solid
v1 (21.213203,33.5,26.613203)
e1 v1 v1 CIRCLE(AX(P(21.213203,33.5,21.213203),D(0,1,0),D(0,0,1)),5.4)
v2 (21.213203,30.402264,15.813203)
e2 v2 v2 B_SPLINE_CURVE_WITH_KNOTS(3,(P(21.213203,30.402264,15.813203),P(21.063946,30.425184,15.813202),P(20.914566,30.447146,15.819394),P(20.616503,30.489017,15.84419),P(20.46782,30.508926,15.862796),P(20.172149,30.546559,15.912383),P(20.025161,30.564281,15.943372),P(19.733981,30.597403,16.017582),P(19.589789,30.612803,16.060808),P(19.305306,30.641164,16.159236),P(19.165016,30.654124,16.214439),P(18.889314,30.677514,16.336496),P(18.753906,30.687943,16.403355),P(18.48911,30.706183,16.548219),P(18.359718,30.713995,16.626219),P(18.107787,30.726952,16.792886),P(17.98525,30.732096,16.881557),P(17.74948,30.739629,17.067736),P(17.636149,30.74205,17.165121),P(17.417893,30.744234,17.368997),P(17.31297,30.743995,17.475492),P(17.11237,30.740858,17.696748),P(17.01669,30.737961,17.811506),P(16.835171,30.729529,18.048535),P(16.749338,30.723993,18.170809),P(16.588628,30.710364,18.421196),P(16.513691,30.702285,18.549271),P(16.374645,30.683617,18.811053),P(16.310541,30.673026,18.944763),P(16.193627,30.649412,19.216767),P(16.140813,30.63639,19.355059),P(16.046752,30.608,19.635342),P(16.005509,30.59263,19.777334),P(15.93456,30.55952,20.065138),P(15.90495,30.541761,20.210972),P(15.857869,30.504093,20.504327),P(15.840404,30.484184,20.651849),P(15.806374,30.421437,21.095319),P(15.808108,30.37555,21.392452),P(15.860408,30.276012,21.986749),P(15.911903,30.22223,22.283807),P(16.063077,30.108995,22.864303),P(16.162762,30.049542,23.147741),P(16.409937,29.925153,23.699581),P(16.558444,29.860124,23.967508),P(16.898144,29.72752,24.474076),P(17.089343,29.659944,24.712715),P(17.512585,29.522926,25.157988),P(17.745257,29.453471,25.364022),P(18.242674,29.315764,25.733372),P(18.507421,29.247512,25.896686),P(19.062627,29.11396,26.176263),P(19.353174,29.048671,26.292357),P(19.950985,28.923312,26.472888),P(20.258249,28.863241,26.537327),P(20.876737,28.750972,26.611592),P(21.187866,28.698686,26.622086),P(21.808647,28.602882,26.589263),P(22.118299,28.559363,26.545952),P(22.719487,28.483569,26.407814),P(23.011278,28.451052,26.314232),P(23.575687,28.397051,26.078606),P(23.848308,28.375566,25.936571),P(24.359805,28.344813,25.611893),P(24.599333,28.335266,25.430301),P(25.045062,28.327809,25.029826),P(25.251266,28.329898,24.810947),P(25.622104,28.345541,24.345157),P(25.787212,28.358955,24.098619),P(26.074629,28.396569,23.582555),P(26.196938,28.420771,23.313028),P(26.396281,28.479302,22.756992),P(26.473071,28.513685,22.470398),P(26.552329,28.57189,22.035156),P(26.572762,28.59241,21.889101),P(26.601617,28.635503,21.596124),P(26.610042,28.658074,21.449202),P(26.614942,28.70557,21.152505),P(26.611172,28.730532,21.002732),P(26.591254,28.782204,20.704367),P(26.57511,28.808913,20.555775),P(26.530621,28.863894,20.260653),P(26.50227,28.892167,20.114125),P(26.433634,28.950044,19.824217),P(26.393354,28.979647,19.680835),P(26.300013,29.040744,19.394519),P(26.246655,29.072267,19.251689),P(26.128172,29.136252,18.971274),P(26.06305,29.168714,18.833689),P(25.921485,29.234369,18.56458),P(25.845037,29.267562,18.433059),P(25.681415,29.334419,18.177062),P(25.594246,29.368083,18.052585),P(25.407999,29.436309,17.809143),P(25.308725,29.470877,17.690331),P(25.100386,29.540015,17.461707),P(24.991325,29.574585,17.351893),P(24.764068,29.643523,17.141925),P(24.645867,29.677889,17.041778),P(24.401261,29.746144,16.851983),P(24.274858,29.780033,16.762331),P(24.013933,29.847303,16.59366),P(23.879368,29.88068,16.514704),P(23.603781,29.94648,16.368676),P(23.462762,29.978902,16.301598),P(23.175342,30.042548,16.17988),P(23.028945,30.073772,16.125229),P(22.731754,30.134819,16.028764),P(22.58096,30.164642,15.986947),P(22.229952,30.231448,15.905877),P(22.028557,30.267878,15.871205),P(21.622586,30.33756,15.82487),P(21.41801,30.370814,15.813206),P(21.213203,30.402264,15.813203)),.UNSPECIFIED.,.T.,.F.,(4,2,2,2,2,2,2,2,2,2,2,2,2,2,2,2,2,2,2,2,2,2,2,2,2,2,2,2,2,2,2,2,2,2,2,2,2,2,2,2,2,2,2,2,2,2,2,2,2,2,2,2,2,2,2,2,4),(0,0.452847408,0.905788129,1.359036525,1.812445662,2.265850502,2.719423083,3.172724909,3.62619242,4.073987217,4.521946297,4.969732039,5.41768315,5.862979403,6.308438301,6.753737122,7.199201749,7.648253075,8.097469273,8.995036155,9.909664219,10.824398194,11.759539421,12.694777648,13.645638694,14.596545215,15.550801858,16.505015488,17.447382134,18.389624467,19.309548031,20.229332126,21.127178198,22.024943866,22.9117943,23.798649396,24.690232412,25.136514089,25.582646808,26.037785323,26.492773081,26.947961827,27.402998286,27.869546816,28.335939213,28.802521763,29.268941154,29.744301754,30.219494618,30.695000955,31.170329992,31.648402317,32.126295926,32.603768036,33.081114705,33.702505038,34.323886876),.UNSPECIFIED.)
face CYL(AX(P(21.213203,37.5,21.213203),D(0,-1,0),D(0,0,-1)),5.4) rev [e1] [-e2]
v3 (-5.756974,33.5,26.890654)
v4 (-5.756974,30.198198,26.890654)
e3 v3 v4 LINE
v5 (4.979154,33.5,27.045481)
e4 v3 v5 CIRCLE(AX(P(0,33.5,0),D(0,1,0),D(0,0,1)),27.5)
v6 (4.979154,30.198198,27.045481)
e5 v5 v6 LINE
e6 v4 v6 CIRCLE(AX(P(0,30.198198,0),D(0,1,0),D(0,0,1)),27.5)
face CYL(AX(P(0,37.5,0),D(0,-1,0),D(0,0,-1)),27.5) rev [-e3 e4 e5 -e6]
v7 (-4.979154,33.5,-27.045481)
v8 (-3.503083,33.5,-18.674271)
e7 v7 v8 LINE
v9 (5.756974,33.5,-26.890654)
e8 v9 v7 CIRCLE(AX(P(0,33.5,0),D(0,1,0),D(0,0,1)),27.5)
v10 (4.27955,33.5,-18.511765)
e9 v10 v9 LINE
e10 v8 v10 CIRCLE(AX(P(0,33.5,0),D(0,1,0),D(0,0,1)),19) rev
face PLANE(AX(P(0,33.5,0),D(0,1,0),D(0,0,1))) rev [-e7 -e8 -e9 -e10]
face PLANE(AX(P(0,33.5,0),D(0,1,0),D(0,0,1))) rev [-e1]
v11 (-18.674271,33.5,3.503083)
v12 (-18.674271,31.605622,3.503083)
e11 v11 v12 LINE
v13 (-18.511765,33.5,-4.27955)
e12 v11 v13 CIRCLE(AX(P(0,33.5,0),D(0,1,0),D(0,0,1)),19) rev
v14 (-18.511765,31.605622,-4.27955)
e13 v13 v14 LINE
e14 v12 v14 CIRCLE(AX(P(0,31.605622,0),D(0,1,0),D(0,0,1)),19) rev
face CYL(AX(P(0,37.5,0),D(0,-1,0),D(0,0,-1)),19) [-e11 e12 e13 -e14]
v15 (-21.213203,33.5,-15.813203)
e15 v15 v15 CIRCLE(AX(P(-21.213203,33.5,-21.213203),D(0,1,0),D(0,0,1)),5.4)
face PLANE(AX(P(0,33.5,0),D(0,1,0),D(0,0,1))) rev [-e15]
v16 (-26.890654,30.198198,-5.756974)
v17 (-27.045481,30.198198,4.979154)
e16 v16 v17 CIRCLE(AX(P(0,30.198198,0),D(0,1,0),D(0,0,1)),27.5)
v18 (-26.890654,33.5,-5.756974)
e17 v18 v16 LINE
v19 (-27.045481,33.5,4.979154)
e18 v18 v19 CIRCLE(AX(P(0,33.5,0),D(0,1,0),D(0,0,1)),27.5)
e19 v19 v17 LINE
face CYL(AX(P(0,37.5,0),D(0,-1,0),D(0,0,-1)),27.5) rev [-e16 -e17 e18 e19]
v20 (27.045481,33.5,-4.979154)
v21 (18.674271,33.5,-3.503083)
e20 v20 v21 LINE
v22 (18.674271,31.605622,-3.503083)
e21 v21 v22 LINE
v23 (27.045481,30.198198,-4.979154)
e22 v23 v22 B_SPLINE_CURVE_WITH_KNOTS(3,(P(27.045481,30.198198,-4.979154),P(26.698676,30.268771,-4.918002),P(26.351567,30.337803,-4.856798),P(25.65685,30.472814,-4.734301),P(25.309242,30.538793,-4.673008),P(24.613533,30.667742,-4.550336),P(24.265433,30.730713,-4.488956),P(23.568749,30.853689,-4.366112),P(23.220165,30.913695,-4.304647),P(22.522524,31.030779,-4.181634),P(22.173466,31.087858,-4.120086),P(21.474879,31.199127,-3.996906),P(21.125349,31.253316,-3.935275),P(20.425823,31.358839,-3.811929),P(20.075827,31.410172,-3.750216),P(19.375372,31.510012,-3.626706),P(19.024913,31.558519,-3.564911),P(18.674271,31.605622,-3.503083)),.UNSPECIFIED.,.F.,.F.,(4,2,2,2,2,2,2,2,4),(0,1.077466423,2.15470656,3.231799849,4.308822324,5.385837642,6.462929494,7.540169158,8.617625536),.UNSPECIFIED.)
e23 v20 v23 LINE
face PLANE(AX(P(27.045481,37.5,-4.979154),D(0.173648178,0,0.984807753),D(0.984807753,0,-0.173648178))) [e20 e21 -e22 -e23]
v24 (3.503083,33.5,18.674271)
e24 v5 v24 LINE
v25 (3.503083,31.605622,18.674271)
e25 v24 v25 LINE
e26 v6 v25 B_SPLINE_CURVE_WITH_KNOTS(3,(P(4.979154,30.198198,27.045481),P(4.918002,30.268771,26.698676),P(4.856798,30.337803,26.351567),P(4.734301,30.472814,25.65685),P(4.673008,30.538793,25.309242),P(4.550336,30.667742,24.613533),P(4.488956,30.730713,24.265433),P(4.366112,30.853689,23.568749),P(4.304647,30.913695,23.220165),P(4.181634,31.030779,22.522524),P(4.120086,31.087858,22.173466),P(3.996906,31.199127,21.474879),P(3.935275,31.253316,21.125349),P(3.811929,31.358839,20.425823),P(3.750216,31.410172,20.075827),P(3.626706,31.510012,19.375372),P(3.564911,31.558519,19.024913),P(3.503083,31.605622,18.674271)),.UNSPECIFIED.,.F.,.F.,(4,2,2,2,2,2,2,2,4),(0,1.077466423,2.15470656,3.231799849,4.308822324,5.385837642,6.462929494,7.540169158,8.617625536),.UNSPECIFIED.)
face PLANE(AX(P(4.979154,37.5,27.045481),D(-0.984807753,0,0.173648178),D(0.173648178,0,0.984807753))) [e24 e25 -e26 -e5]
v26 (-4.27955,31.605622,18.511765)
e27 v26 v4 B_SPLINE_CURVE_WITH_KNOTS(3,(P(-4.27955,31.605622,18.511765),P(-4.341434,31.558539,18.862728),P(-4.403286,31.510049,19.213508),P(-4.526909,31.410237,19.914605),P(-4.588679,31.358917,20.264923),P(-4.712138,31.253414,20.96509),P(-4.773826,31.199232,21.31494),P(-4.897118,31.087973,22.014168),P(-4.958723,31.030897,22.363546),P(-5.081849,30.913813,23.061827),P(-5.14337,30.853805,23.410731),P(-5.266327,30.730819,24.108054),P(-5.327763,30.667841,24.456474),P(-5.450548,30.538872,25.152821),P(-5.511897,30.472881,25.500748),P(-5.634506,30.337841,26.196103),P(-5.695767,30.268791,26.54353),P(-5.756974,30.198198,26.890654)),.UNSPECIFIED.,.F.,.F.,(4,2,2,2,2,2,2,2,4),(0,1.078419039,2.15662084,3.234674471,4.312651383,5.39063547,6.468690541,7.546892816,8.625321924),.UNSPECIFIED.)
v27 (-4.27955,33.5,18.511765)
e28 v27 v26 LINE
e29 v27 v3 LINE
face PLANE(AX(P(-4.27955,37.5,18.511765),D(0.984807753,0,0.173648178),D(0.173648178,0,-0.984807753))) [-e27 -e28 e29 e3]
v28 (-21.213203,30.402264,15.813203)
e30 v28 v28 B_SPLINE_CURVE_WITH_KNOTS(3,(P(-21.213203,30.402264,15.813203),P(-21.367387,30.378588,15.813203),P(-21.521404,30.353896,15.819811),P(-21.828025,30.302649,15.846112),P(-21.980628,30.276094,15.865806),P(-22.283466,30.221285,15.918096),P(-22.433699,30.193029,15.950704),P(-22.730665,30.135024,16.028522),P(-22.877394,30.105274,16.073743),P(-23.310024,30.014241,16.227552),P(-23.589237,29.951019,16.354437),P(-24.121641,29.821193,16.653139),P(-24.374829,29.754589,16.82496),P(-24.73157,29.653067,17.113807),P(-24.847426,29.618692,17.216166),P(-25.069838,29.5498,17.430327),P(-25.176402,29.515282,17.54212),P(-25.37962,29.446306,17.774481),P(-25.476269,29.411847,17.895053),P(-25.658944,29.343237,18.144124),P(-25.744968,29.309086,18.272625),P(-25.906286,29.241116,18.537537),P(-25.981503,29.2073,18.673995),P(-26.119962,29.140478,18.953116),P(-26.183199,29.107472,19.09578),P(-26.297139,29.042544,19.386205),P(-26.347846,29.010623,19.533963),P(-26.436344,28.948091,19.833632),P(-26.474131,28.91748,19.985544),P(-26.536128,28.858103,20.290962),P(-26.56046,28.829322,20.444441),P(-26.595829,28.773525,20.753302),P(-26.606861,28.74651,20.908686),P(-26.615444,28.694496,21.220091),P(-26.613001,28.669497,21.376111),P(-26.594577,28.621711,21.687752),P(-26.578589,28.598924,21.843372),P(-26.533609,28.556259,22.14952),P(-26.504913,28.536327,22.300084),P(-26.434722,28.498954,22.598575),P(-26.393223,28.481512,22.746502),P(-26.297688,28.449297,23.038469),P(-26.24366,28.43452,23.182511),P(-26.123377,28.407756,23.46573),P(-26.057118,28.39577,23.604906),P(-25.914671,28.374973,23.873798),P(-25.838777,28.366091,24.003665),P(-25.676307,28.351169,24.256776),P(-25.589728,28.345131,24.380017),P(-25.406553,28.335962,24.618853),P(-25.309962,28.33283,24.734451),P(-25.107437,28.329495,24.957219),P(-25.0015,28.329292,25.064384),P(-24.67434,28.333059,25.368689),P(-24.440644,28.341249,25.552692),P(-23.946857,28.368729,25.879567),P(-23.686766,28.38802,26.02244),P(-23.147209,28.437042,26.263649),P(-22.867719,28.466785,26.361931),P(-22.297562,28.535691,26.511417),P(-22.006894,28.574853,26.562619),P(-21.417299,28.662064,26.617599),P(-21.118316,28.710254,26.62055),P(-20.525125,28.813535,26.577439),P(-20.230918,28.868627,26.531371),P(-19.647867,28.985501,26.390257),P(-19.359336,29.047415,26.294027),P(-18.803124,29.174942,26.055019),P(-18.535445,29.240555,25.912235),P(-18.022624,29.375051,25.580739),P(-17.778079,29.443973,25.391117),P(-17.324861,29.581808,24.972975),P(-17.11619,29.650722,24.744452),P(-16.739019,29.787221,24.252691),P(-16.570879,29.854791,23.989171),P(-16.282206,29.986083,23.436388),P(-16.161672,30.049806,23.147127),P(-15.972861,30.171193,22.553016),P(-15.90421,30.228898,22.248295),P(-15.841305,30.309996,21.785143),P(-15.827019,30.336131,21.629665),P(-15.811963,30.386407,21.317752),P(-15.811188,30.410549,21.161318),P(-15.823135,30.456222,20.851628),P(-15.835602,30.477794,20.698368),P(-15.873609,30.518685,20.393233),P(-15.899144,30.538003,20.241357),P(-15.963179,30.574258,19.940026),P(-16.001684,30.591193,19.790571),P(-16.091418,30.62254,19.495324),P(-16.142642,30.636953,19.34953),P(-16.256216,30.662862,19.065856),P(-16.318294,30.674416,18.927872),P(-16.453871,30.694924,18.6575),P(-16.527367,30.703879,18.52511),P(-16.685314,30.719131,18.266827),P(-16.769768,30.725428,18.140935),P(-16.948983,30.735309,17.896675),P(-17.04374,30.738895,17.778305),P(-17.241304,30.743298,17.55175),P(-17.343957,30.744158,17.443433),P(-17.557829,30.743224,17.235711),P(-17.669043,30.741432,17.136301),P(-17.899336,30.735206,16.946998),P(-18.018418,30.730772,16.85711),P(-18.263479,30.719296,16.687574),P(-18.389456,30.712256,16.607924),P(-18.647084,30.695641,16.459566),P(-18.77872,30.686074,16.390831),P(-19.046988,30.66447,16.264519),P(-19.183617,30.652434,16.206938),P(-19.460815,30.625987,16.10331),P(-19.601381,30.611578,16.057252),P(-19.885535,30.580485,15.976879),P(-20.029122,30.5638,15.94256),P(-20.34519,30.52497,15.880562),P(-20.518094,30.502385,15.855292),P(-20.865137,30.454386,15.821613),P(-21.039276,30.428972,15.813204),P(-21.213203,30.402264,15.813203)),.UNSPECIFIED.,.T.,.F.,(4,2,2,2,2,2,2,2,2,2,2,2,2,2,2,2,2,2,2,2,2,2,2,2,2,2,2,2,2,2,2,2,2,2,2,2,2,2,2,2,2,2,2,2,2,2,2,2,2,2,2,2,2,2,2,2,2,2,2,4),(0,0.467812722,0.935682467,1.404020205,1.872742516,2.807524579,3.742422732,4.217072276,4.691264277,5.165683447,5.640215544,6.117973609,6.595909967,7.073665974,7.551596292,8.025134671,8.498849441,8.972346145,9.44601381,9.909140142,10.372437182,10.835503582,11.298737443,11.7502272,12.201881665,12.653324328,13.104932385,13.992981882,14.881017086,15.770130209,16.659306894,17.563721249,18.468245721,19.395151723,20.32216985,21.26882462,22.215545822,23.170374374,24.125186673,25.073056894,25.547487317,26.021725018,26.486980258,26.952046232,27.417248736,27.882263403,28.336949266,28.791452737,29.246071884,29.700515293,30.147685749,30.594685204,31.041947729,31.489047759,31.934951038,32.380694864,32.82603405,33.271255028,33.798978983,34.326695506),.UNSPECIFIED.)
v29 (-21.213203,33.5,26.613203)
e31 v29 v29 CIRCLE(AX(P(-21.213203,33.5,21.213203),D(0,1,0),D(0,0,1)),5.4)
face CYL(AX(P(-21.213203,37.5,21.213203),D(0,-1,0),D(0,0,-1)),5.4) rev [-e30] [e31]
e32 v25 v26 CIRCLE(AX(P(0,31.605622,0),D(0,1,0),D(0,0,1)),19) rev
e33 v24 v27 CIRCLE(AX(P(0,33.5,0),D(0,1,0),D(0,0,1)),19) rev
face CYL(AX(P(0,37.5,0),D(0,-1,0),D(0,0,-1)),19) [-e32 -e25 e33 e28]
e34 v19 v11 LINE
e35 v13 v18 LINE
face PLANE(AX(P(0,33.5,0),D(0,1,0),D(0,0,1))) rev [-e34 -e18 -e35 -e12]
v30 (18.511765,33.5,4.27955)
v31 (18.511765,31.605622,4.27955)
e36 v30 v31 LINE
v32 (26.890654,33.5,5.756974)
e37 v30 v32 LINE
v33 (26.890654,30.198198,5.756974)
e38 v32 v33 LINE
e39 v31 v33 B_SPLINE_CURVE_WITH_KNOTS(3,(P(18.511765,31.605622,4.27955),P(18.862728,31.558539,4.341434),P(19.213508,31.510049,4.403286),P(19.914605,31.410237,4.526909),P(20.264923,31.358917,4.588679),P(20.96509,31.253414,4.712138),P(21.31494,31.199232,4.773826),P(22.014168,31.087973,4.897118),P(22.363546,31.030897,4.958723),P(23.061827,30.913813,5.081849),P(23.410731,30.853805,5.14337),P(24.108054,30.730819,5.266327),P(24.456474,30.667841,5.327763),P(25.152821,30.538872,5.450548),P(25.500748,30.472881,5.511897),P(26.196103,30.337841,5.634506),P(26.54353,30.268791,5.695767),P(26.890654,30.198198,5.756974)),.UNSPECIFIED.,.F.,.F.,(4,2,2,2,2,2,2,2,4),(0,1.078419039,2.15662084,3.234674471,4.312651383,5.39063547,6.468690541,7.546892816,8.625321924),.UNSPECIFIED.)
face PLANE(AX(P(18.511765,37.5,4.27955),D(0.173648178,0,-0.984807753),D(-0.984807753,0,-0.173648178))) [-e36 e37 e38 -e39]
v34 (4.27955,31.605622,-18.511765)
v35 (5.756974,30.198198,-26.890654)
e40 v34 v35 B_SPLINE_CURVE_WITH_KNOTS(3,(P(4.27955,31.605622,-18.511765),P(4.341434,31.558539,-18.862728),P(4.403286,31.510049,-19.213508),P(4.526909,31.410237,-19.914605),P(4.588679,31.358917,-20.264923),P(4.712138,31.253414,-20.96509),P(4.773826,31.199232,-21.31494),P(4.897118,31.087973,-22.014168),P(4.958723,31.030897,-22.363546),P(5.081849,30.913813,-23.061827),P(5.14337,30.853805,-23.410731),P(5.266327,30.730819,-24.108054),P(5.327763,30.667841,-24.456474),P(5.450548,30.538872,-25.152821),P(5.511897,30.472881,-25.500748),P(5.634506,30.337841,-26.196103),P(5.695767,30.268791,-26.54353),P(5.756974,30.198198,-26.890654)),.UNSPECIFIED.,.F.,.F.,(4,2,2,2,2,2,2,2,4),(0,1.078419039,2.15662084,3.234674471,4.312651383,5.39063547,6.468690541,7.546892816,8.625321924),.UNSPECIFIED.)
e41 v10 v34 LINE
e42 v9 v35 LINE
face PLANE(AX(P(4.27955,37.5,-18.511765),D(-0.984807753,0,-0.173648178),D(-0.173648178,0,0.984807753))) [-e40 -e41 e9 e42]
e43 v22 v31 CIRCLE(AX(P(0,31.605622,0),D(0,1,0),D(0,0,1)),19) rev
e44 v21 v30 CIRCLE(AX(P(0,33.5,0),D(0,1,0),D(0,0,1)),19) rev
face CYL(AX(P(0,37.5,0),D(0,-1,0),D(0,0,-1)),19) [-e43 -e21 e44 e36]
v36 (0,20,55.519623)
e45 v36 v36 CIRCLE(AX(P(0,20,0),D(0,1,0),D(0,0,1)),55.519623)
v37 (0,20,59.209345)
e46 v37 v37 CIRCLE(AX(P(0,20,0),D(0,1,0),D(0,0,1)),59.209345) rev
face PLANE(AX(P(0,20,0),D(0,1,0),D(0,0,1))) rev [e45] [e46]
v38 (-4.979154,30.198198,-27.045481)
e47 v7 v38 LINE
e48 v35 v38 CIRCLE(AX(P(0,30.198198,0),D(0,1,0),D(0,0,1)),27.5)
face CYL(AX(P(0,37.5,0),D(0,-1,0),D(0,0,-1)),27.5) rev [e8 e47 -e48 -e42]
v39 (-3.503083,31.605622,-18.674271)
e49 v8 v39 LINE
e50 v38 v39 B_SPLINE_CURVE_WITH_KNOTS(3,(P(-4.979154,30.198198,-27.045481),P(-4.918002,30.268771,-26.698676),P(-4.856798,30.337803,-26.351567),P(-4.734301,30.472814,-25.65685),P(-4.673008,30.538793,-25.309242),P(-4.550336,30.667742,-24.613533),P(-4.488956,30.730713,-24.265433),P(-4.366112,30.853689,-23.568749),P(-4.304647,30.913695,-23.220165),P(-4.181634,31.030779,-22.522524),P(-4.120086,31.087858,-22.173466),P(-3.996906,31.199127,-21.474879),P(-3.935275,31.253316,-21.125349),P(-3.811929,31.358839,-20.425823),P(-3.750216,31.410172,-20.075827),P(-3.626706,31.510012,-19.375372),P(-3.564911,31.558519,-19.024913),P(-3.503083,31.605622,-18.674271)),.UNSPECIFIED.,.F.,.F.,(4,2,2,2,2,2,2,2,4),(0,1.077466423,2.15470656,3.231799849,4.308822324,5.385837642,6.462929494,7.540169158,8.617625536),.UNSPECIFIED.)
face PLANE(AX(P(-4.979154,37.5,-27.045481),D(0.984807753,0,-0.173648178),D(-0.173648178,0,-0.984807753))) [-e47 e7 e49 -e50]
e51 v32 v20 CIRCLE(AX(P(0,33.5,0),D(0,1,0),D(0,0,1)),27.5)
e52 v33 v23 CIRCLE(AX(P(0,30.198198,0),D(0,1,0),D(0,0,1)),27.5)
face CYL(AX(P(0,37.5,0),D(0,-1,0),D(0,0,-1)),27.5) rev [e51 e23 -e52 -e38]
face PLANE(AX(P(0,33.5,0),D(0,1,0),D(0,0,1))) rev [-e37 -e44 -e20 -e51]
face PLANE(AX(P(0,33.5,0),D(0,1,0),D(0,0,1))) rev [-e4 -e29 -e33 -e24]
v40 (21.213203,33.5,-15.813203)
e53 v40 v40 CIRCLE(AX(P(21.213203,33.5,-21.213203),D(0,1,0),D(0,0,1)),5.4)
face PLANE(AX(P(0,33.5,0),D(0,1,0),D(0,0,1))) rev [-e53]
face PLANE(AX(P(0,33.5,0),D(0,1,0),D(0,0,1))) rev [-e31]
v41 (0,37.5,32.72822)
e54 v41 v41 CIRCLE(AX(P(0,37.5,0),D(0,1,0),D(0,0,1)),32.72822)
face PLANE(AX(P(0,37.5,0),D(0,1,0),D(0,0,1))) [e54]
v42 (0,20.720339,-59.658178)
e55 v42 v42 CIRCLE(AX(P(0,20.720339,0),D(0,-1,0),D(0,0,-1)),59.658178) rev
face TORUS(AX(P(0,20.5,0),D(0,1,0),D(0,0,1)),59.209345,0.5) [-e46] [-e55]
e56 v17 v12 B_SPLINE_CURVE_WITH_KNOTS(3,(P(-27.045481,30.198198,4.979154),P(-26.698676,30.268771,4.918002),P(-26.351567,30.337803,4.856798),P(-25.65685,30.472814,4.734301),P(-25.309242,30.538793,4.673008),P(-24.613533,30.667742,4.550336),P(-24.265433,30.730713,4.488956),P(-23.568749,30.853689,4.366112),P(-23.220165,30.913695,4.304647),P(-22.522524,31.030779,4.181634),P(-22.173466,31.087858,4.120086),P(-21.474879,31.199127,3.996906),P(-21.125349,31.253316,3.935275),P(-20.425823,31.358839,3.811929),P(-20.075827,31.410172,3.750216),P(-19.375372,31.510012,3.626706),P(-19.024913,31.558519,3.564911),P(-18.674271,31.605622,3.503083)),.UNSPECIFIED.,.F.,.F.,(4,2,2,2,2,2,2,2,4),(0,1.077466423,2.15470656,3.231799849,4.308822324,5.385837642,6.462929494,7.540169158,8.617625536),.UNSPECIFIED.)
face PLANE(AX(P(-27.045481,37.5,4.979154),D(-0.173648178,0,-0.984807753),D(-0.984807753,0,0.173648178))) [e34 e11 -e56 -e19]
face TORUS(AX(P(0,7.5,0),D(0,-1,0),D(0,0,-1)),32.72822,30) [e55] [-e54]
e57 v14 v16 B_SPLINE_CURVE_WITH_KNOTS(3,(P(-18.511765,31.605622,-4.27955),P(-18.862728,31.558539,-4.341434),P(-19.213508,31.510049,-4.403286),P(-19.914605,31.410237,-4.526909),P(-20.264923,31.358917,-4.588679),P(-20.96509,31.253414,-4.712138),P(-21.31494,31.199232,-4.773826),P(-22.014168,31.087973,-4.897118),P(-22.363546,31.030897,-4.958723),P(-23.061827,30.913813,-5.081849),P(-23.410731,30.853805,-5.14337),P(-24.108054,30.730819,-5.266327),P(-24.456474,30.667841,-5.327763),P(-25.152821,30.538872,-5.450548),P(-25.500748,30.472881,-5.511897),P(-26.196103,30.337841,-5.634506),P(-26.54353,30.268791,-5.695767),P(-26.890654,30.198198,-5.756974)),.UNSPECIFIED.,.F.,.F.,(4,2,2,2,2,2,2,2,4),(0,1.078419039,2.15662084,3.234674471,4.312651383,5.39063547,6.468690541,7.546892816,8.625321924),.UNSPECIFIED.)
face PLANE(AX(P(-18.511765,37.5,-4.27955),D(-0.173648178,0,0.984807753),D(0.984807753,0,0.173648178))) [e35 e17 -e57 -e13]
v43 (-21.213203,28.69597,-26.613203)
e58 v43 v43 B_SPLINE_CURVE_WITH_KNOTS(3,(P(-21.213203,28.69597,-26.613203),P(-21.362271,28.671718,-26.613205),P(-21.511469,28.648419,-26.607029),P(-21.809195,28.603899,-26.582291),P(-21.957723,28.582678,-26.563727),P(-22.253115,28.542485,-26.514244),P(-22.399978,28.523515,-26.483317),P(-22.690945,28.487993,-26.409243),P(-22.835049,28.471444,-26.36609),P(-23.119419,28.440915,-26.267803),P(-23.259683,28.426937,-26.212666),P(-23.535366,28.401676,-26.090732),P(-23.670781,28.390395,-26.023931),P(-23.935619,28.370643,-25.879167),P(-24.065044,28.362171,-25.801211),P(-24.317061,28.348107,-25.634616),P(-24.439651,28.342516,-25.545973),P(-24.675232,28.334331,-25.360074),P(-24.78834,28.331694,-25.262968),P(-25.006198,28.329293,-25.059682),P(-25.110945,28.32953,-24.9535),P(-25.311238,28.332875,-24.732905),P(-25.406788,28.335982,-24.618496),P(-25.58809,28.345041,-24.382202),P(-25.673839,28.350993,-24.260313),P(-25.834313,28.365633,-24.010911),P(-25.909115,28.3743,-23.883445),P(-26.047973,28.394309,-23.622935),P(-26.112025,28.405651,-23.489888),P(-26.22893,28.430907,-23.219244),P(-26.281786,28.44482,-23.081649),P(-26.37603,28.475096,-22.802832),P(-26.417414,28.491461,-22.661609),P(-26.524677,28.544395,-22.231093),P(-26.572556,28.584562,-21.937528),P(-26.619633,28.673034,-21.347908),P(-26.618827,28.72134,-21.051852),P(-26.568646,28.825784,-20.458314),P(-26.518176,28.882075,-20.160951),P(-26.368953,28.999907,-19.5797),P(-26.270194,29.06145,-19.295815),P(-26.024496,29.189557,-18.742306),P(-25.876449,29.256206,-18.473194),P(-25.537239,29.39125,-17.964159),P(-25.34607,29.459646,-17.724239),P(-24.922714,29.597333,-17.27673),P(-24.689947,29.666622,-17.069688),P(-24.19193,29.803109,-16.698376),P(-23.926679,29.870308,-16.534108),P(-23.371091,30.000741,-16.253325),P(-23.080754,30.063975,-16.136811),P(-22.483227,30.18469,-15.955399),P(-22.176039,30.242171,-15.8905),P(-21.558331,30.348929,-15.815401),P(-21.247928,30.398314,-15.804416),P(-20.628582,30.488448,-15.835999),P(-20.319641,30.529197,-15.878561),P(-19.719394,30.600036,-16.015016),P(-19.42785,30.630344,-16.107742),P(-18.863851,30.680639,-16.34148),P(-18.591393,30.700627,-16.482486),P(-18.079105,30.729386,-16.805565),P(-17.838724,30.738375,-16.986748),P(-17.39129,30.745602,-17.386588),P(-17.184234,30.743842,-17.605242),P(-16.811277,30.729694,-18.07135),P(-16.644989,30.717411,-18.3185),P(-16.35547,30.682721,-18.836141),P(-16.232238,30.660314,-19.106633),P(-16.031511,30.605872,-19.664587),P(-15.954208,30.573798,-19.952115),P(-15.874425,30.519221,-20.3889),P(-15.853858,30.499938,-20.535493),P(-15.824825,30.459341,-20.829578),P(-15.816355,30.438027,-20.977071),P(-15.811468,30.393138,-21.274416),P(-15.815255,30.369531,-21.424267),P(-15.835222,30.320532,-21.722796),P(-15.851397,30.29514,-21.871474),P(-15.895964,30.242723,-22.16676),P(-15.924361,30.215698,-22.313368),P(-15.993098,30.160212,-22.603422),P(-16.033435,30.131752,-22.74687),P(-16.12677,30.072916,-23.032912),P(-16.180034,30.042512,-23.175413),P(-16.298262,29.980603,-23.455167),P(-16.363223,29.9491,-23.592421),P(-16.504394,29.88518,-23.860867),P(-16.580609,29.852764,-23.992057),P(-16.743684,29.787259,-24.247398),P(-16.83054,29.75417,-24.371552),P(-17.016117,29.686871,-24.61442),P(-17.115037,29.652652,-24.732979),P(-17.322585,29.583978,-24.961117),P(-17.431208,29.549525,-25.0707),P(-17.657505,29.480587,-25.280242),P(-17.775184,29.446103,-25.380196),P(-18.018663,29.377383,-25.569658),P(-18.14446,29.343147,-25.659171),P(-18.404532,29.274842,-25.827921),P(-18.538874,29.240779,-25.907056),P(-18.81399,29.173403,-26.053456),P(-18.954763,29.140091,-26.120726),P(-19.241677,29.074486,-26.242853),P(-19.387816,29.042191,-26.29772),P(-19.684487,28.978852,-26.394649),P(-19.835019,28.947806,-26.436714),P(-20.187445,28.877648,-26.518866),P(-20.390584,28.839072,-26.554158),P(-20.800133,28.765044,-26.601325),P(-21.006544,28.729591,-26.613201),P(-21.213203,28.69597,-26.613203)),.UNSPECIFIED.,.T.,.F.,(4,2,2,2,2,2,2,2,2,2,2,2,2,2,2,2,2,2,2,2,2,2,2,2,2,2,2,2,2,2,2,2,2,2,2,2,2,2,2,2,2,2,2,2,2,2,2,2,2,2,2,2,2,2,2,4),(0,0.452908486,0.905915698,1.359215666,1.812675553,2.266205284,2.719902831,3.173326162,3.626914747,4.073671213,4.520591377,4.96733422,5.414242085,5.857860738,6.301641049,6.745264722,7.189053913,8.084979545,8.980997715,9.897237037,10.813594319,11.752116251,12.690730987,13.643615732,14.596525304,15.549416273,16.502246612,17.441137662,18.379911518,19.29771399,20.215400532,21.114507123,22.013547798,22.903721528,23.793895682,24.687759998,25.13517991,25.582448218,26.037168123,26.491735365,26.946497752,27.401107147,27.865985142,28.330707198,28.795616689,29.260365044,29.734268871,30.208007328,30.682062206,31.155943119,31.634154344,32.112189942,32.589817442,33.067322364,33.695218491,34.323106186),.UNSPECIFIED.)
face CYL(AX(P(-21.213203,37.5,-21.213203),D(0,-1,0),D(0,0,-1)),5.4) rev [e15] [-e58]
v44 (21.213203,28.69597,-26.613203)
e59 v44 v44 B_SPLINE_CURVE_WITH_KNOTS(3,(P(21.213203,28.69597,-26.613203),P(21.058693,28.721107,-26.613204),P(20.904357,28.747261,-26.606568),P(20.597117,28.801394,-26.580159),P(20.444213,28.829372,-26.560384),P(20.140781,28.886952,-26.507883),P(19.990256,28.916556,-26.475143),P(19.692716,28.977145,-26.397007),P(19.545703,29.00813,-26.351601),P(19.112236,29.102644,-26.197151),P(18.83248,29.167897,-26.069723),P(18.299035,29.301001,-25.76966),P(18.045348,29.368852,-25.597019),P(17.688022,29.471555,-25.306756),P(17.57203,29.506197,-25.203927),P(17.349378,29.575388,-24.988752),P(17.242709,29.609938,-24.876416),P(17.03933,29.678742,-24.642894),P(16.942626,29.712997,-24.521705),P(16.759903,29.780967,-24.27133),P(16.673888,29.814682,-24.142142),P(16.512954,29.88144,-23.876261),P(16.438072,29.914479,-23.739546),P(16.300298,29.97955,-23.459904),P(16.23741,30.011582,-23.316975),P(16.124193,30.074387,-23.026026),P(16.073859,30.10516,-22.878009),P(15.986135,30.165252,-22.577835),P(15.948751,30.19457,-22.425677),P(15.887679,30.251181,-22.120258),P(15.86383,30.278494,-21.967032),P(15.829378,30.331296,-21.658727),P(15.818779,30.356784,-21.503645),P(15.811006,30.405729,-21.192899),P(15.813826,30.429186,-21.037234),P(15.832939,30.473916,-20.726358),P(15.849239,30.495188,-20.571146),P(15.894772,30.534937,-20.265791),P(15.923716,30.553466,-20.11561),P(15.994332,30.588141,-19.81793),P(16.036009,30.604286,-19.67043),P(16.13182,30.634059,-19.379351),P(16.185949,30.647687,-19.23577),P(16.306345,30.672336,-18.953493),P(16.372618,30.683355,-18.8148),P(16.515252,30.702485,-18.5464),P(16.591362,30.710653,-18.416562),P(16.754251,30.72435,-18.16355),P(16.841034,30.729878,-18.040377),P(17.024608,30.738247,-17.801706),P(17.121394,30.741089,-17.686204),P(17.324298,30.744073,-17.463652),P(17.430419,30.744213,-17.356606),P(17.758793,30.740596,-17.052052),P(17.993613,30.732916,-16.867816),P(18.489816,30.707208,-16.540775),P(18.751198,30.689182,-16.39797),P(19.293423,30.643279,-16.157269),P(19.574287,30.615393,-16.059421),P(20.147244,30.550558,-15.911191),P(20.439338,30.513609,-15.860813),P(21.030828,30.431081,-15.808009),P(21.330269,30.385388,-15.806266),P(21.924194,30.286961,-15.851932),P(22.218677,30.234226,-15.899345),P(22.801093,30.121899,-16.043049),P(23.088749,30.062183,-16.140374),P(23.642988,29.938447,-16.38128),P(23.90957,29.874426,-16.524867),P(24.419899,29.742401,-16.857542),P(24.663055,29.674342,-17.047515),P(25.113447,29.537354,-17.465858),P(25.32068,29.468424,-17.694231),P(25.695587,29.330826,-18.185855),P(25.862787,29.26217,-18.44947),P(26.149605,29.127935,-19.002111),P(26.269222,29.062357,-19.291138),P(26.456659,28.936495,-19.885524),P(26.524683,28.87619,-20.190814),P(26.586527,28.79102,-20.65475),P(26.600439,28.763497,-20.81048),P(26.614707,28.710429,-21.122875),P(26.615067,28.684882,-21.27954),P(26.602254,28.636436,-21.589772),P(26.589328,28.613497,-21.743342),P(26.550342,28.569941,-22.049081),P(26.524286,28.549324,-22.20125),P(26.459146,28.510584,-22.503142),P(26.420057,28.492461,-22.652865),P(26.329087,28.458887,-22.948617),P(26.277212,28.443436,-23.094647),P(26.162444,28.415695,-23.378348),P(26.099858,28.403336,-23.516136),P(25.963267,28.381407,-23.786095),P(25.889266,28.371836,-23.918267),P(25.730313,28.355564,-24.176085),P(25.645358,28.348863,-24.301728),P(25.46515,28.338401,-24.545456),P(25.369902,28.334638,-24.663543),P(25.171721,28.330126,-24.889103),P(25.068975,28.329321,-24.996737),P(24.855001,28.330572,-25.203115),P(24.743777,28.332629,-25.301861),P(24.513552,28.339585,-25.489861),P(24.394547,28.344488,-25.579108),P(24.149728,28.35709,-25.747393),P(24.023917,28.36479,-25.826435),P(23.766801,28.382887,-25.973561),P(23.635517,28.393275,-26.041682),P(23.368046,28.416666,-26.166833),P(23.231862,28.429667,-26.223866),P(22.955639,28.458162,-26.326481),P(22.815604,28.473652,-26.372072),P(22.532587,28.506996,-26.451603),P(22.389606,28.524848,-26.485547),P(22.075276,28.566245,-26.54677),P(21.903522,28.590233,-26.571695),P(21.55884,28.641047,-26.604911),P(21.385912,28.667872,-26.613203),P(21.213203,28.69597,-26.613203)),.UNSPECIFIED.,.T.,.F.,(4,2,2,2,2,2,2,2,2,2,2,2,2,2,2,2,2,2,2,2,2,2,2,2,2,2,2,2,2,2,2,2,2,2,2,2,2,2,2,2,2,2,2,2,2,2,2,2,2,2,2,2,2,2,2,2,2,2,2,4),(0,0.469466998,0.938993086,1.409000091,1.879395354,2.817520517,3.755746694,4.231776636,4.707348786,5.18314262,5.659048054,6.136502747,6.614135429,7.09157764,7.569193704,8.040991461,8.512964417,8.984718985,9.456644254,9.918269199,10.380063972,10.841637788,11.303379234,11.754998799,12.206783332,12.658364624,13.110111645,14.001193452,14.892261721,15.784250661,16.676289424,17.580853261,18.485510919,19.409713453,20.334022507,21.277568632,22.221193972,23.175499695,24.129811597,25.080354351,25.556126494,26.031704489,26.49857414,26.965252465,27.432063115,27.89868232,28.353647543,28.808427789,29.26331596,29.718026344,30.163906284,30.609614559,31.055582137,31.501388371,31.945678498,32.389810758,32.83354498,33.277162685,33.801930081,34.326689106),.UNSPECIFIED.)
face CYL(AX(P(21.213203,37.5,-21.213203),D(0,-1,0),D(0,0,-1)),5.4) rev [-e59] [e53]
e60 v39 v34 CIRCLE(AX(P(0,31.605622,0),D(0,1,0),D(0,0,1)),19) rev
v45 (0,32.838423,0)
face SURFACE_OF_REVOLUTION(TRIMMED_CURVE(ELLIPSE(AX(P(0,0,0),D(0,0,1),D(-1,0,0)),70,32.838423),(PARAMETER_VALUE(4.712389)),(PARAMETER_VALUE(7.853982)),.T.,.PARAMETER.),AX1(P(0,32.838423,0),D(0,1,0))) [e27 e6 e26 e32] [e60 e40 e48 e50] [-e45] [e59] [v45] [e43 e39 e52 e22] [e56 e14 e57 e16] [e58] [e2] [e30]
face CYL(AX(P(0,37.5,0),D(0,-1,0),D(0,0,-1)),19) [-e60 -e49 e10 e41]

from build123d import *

# Parameters (mm, degrees)
STOCK_DISK_1_START       = 20
STOCK_DISK_1_OUTLINE_R   = 40
STOCK_DISK_1_OUTLINE_R_2 = 5.4
STOCK_DISK_1_DEPTH       = 17.5
STOCK_DISK_1_START_2     = 33.5
STOCK_DISK_1_2_OUTLINE_R = 5.4
STOCK_DISK_1_2_DEPTH     = 4
SKETCH3_R                = 60
SKETCH3_R_2              = 40
BOSS_EXTRUDE2_DEPTH      = 17.5
FILLET4_R                = 30
FILLET5_R                = 0.5


# Read off the part's stored shape, not the designer's step: Stock-disk-1
with BuildPart() as part:
    # Stock-disk-1 outline → Stock-disk-1 (new body)
    with BuildSketch(Plane(origin=(0, 0, 0), x_dir=(1, 0, 0), z_dir=(0, 1, 0)).offset(STOCK_DISK_1_START)):
        Circle(STOCK_DISK_1_OUTLINE_R)
        with Locations((-21.213203436, -21.213203436)):
            Circle(STOCK_DISK_1_OUTLINE_R_2, mode=Mode.SUBTRACT)
        with BuildLine():
            ThreePointArc((-4.279550271, -18.511765164), (-0.396644977, -18.995859358), (3.503083449, -18.67427124))
            Line((3.503083449, -18.67427124), (4.97915355, -27.045480767))
            ThreePointArc((4.97915355, -27.045480767), (-0.396540251, -27.497140866), (-5.756974355, -26.890653512))
            Line((-5.756974355, -26.890653512), (-4.279550271, -18.511765164))
        make_face(mode=Mode.SUBTRACT)
        with Locations((21.213203436, -21.213203436)):
            Circle(STOCK_DISK_1_OUTLINE_R_2, mode=Mode.SUBTRACT)
        with BuildLine():
            Line((18.67427124, 3.503083449), (27.045480767, 4.97915355))
            ThreePointArc((27.045480767, 4.97915355), (27.497140866, -0.396540251), (26.890653512, -5.756974355))
            Line((26.890653512, -5.756974355), (18.511765164, -4.279550271))
            ThreePointArc((18.511765164, -4.279550271), (18.995859358, -0.396644977), (18.67427124, 3.503083449))
        make_face(mode=Mode.SUBTRACT)
        with BuildLine():
            ThreePointArc((-18.511765164, 4.279550271), (-18.995859358, 0.396644977), (-18.67427124, -3.503083449))
            Line((-18.67427124, -3.503083449), (-27.045480767, -4.97915355))
            ThreePointArc((-27.045480767, -4.97915355), (-27.497140866, 0.396540251), (-26.890653512, 5.756974355))
            Line((-26.890653512, 5.756974355), (-18.511765164, 4.279550271))
        make_face(mode=Mode.SUBTRACT)
        with Locations((-21.213203436, 21.213203436)):
            Circle(STOCK_DISK_1_OUTLINE_R_2, mode=Mode.SUBTRACT)
        with BuildLine():
            Line((-3.503083449, 18.67427124), (-4.97915355, 27.045480767))
            ThreePointArc((-4.97915355, 27.045480767), (0.396540251, 27.497140866), (5.756974355, 26.890653512))
            Line((5.756974355, 26.890653512), (4.279550271, 18.511765164))
            ThreePointArc((4.279550271, 18.511765164), (0.396644977, 18.995859358), (-3.503083449, 18.67427124))
        make_face(mode=Mode.SUBTRACT)
        with Locations((21.213203436, 21.213203436)):
            Circle(STOCK_DISK_1_OUTLINE_R_2, mode=Mode.SUBTRACT)
    extrude(amount=STOCK_DISK_1_DEPTH)

    # Stock-disk-1 2 outline → Stock-disk-1 2 (add)
    with BuildSketch(Plane(origin=(0, 0, 0), x_dir=(1, 0, 0), z_dir=(0, 1, 0)).offset(STOCK_DISK_1_START_2)):
        with Locations((-21.213203436, -21.213203436)):
            Circle(STOCK_DISK_1_2_OUTLINE_R)
        with BuildLine():
            Line((-27.045480767, -4.97915355), (-18.67427124, -3.503083449))
            ThreePointArc((-18.67427124, -3.503083449), (-18.995859358, 0.396644977), (-18.511765164, 4.279550271))
            Line((-18.511765164, 4.279550271), (-26.890653512, 5.756974355))
            ThreePointArc((-26.890653512, 5.756974355), (-27.497140866, 0.396540251), (-27.045480767, -4.97915355))
        make_face()
        with Locations((-21.213203436, 21.213203436)):
            Circle(STOCK_DISK_1_2_OUTLINE_R)
        with Locations((21.213203436, 21.213203436)):
            Circle(STOCK_DISK_1_2_OUTLINE_R)
        with Locations((21.213203436, -21.213203436)):
            Circle(STOCK_DISK_1_2_OUTLINE_R)
        with BuildLine():
            ThreePointArc((5.756974355, 26.890653512), (0.396540251, 27.497140866), (-4.97915355, 27.045480767))
            Line((-4.97915355, 27.045480767), (-3.503083449, 18.67427124))
            ThreePointArc((-3.503083449, 18.67427124), (0.396644977, 18.995859358), (4.279550271, 18.511765164))
            Line((4.279550271, 18.511765164), (5.756974355, 26.890653512))
        make_face()
        with BuildLine():
            ThreePointArc((26.890653512, -5.756974355), (27.497140866, -0.396540251), (27.045480767, 4.97915355))
            Line((27.045480767, 4.97915355), (18.67427124, 3.503083449))
            ThreePointArc((18.67427124, 3.503083449), (18.995859358, -0.396644977), (18.511765164, -4.279550271))
            Line((18.511765164, -4.279550271), (26.890653512, -5.756974355))
        make_face()
        with BuildLine():
            Line((4.97915355, -27.045480767), (3.503083449, -18.67427124))
            ThreePointArc((3.503083449, -18.67427124), (-0.396644977, -18.995859358), (-4.279550271, -18.511765164))
            Line((-4.279550271, -18.511765164), (-5.756974355, -26.890653512))
            ThreePointArc((-5.756974355, -26.890653512), (-0.396540251, -27.497140866), (4.97915355, -27.045480767))
        make_face()
    extrude(amount=STOCK_DISK_1_2_DEPTH)

    # Sketch3 → Boss-Extrude2 (add)
    with BuildSketch(Plane.XZ.offset(-20)):
        with Locations(Location((0, 0, 0), (0, 0, 270))):
            Circle(SKETCH3_R)
        Circle(SKETCH3_R_2, mode=Mode.SUBTRACT)
    extrude(amount=-BOSS_EXTRUDE2_DEPTH)

    # Fillet4
    # the kernel refuses this fillet: 30 mm, written as the material it takes off along each edge
    with BuildSketch(Plane(origin=(0, 37.5, 0), x_dir=(0, 0, -1), z_dir=(-1, 0, 0))) as fillet4_piece_1:
        with BuildLine():
            CenterArc((32.728219713, 30), FILLET4_R, 270, 65.375681648)
            Line((32.728219713, 0), (32.728219713, -0.6))
            Line((32.728219713, -0.6), (60, -0.6))
            Line((60, -0.6), (60.6, 0))
            ThreePointArc((60.6, 0), (60.6, 8.75), (60.545435606, 17.25))
            Line((60.545435606, 17.25), (60, 17.5))
        make_face()
    revolve(axis=Axis((0, 37.5, 0), (0, -1, 0)), mode=Mode.SUBTRACT)

    # Fillet5
    fillet5_edges = [part.edges().sort_by_distance(p)[0] for p in [
        (0, 20, 60),
    ]]
    fillet(fillet5_edges, radius=FILLET5_R)

    # Sketch4 → Cut-Revolve7 (revolve, cut)
    with BuildSketch(Plane.XY):
        with BuildLine():
            Line((0, 32.838422871), (0, -32.838422871))
            add(Edge.make_bspline(
                [(0, 32.838422871), (-70, 32.838422871), (-70, 0), (-70, -32.838422871), (0, -32.838422871)],
                knots=[4.71238898, 4.71238898, 4.71238898, 6.283185307, 6.283185307, 7.853981634, 7.853981634, 7.853981634], degree=2, weights=[1, 0.707106781, 1, 0.707106781, 1]))
        make_face()
    revolve(axis=Axis((0, 32.838422871, 0), (0, -1, 0)), mode=Mode.SUBTRACT)


solid = part.part
